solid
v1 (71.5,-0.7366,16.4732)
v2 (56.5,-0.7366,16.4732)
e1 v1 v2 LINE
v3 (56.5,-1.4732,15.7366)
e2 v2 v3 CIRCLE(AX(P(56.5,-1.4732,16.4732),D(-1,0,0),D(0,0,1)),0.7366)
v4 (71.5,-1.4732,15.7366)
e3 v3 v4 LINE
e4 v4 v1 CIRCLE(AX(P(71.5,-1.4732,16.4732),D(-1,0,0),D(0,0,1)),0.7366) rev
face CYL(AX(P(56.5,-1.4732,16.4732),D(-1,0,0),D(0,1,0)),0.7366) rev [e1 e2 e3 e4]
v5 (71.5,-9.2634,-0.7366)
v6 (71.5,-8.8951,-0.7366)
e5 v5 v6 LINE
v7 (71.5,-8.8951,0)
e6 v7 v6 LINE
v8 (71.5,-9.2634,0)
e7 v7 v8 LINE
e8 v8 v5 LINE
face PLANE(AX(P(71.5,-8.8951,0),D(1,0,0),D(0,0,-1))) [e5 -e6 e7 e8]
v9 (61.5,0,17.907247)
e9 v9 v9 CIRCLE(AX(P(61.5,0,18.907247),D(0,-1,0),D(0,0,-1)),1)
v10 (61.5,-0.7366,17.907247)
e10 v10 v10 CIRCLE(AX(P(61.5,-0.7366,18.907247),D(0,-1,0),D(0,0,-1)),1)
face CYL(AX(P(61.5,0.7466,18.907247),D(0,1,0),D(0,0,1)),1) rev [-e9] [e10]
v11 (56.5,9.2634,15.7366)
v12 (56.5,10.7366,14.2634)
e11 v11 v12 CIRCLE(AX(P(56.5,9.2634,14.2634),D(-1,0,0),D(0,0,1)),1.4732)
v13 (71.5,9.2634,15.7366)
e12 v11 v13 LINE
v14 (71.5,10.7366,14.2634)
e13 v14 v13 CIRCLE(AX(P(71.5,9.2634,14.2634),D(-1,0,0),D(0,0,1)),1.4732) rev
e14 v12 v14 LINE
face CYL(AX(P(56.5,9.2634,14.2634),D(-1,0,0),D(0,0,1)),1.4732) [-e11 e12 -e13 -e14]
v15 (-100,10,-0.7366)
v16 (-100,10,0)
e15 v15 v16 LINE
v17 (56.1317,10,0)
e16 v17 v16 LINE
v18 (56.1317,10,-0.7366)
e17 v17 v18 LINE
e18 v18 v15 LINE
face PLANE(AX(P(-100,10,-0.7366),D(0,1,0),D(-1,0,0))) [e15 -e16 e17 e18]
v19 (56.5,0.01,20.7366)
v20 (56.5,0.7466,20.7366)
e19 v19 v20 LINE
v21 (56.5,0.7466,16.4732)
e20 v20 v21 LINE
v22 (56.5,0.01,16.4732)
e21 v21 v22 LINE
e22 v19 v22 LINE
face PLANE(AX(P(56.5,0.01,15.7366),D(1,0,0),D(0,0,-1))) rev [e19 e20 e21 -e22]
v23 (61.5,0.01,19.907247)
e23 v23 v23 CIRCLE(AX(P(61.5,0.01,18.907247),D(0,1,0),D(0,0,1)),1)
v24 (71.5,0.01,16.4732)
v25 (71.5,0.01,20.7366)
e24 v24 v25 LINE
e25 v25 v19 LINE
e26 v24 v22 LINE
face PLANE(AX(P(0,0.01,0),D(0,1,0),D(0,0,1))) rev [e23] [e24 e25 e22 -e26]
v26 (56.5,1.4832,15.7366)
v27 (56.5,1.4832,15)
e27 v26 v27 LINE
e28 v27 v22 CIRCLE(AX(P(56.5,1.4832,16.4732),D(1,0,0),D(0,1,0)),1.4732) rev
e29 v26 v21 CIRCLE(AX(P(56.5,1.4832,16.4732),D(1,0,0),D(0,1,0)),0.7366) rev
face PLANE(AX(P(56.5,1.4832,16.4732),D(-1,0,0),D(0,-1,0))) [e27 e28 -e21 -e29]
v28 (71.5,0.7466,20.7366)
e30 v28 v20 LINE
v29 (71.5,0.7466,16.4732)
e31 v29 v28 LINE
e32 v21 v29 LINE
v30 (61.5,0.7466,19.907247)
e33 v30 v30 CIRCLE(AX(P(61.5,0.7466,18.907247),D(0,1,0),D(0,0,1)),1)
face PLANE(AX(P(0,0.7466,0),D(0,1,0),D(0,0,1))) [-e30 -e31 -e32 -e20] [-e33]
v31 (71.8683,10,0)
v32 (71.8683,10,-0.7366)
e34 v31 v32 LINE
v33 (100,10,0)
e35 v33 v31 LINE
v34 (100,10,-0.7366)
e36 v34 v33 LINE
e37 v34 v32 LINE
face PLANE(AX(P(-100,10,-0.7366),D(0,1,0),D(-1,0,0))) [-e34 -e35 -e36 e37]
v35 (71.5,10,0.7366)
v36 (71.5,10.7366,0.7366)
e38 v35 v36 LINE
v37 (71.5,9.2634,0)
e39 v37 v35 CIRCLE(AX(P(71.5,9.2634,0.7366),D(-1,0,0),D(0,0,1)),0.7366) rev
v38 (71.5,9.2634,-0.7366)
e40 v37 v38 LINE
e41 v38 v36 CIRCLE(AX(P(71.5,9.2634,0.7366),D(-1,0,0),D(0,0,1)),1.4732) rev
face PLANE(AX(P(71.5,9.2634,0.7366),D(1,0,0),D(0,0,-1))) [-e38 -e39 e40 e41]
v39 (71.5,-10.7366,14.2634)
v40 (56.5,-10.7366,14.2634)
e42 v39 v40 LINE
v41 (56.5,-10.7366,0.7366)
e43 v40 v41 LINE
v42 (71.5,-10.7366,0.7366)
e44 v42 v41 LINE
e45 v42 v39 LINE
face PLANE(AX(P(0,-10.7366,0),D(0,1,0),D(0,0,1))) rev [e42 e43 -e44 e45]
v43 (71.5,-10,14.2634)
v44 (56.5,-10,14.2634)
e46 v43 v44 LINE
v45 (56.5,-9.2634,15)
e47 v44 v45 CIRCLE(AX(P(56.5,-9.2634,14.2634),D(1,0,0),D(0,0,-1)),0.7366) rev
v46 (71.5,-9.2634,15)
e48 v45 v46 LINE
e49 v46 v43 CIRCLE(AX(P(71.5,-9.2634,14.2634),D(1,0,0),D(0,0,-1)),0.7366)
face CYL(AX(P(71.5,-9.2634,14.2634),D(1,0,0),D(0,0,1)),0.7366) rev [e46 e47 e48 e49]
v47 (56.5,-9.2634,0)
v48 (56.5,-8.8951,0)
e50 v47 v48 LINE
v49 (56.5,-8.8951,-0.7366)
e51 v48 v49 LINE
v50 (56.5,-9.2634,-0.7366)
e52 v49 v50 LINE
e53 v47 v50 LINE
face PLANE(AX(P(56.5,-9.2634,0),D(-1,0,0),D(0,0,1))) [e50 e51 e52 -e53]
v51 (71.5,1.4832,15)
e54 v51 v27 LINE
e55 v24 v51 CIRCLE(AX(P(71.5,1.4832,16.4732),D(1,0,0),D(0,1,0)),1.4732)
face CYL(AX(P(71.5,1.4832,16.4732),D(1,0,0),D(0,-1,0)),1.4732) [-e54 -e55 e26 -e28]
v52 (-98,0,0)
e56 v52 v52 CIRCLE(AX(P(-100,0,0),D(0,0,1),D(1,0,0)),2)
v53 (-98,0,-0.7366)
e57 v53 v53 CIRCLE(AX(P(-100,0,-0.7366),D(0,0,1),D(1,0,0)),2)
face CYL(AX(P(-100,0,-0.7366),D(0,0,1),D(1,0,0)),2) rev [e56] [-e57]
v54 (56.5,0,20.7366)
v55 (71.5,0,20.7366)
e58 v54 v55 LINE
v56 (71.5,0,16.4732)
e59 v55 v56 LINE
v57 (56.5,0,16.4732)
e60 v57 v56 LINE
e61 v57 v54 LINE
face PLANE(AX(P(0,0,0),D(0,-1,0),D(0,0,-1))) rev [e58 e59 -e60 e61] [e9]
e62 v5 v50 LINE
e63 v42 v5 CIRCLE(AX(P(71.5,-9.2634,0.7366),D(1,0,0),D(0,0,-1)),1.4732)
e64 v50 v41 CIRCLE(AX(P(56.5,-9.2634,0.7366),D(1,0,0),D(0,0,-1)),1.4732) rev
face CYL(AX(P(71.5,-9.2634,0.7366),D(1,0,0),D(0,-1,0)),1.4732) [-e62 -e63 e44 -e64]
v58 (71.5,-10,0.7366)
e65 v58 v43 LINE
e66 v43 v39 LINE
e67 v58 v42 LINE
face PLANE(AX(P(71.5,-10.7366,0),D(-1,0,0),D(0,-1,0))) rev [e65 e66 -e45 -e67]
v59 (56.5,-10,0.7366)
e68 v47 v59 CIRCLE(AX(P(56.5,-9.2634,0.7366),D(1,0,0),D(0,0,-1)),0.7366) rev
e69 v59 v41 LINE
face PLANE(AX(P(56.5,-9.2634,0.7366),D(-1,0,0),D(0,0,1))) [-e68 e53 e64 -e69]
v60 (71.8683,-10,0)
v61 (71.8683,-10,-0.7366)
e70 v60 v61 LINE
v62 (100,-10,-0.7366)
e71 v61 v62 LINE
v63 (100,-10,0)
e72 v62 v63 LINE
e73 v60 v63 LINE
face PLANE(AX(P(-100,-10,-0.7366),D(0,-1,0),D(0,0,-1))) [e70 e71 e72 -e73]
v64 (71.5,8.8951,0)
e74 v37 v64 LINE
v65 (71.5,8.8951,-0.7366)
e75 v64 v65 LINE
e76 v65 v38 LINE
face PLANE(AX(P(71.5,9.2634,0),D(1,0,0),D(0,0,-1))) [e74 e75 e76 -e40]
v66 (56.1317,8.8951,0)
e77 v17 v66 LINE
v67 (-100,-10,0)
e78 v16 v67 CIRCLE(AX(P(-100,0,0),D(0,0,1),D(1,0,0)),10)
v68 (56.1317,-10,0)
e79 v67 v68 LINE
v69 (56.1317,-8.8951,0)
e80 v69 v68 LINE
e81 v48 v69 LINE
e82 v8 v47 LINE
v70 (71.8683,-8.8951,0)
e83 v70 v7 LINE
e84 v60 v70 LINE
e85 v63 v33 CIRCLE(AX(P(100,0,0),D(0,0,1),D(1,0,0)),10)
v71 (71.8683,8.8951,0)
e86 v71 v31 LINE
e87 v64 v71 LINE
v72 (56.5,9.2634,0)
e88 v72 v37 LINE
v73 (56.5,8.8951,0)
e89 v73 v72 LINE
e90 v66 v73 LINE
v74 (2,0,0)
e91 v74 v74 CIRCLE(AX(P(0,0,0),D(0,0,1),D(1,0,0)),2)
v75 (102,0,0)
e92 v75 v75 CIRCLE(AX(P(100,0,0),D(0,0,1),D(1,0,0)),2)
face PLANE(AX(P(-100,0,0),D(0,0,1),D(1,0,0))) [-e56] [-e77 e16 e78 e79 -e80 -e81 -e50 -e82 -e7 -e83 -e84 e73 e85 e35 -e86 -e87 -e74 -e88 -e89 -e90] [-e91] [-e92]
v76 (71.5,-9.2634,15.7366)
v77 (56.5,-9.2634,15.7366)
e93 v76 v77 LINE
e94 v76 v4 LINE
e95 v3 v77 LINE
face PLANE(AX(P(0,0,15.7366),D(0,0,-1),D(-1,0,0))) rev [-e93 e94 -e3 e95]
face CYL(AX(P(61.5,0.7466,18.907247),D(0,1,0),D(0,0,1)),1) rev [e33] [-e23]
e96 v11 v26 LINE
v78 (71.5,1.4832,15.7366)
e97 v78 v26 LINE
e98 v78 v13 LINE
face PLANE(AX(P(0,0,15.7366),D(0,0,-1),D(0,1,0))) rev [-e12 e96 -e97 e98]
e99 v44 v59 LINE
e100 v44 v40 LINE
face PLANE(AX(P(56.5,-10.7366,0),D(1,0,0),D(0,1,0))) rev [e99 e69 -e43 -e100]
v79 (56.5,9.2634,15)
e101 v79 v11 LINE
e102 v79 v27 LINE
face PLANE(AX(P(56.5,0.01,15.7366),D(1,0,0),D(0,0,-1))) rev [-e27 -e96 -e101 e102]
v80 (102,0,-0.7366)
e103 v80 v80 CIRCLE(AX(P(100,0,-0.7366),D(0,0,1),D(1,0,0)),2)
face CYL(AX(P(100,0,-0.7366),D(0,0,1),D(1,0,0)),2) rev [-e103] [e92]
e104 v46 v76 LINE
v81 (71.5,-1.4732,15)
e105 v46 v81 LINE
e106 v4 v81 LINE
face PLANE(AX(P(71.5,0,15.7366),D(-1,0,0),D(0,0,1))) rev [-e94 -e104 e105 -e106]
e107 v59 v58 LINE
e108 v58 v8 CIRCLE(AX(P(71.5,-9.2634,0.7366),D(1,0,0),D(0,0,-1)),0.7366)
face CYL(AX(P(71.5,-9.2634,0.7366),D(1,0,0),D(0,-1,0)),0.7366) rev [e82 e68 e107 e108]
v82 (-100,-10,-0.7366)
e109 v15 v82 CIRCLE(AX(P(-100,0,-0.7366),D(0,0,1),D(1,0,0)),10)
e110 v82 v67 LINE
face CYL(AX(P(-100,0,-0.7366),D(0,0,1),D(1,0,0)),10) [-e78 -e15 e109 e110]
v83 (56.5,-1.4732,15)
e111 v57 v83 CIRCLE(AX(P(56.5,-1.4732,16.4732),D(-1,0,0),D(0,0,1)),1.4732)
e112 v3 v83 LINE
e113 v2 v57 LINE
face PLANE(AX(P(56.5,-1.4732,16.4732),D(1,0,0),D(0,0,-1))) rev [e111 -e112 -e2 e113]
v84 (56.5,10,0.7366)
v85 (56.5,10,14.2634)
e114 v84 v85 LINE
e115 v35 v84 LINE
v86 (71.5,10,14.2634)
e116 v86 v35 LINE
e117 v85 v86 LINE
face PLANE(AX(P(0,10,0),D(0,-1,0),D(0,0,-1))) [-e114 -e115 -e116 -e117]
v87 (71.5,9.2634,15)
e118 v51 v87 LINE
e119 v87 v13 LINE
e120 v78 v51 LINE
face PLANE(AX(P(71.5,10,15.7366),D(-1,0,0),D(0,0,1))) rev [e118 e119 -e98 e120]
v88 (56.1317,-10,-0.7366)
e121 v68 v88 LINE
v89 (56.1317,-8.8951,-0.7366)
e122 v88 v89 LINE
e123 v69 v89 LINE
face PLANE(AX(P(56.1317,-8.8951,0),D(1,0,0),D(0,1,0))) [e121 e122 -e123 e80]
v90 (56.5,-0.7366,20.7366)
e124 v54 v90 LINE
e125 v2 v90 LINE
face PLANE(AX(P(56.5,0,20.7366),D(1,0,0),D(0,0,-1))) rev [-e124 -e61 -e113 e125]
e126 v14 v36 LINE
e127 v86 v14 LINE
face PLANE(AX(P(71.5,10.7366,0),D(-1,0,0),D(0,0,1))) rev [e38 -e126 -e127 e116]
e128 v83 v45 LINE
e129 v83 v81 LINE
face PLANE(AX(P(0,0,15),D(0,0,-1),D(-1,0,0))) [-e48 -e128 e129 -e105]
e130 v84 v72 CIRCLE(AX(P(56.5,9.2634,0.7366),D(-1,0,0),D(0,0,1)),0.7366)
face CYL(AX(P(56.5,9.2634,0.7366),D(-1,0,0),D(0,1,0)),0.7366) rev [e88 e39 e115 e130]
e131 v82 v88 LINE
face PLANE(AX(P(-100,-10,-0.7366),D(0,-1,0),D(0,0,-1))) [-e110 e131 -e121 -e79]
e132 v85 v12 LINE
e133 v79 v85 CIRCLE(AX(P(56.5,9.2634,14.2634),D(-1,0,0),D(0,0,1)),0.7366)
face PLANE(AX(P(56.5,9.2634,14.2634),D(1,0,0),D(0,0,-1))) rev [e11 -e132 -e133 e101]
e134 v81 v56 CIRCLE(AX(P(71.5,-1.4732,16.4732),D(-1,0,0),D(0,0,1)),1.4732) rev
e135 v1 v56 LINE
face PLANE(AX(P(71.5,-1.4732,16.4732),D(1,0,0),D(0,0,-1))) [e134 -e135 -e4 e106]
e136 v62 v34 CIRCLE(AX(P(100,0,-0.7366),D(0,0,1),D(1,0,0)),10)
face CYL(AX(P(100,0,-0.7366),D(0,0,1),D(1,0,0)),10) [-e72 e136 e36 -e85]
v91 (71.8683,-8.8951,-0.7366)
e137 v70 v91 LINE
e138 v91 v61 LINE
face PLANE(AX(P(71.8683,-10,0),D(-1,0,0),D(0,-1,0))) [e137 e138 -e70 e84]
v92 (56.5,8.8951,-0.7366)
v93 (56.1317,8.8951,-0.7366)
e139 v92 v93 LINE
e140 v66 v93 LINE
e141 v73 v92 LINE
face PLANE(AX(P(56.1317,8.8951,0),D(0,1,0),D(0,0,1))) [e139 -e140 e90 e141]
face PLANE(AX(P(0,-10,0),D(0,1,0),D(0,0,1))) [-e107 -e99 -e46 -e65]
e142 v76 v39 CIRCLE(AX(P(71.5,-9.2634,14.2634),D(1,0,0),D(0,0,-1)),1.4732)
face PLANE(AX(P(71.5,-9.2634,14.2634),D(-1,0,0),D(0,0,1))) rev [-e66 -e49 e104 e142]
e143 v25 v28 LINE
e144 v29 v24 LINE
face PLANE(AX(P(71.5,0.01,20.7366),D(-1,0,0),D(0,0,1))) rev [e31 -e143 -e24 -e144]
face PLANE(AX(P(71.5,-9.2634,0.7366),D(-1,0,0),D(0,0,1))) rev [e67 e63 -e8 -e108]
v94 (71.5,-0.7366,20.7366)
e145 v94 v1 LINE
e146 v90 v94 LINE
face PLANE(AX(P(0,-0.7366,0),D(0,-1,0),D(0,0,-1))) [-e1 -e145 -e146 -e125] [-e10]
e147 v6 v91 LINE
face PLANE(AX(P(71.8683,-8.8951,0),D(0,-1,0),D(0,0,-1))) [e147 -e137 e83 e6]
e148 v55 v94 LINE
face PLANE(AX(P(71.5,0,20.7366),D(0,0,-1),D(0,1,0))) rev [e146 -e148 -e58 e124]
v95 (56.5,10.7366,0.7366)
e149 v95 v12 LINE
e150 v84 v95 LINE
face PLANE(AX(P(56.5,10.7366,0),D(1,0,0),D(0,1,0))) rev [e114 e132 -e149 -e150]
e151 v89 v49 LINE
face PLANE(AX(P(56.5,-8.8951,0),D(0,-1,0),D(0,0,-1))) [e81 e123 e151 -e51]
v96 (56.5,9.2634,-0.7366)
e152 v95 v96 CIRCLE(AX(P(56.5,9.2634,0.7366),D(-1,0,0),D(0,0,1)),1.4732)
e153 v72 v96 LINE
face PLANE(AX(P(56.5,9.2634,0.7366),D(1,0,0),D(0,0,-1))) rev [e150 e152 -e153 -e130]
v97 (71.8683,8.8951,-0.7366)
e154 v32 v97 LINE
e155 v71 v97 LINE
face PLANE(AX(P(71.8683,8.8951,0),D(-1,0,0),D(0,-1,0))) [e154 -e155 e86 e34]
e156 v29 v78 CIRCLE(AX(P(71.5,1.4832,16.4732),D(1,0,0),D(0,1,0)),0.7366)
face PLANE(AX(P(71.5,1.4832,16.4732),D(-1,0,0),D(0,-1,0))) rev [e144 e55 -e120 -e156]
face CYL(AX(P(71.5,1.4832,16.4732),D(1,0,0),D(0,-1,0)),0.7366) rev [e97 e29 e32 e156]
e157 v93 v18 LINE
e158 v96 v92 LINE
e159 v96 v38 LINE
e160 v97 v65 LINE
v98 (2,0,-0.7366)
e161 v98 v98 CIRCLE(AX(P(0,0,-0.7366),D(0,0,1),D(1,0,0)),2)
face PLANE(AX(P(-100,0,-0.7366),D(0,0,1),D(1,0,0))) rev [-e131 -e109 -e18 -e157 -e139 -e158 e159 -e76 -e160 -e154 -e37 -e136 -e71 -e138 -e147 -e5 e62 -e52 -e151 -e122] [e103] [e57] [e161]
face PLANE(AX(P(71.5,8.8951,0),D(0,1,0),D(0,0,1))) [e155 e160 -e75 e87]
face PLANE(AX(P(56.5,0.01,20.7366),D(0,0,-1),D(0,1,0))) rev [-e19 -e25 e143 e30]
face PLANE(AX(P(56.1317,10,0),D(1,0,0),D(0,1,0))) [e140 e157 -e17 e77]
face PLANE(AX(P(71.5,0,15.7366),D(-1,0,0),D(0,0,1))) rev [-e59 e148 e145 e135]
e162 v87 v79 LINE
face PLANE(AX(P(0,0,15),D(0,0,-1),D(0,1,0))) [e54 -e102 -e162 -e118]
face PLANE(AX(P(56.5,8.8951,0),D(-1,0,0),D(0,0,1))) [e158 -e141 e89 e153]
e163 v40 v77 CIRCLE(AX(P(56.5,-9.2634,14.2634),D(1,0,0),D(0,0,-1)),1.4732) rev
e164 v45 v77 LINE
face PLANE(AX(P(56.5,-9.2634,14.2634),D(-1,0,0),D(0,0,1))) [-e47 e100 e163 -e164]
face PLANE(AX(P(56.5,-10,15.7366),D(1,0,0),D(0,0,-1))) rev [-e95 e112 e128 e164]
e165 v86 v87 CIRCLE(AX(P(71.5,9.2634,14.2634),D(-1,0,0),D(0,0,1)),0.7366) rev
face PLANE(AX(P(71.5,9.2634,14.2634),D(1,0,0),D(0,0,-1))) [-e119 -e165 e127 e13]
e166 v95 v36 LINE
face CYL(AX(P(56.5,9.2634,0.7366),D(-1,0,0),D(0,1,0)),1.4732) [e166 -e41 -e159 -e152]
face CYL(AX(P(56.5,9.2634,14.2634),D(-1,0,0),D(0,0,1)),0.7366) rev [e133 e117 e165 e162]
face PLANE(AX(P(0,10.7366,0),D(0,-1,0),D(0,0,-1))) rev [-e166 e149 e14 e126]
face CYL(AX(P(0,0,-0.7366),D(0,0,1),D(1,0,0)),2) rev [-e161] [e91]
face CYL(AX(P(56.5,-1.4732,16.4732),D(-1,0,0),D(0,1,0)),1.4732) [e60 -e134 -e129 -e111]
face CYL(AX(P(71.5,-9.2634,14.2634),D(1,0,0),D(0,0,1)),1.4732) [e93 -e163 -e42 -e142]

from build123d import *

# Parameters (mm, degrees)
SKETCH2_R                     = 2
BASE_FLANGE1_DEPTH            = 0.7366
EDGE_FLANGE1_STRIP_W          = 4.4196
EDGE_FLANGE1_STRIP_H          = 0.7366
EDGE_FLANGE1_STRIP_CUT_DEPTH  = 15
EDGE_FLANGE1_RELIEF_W         = 4.7879
EDGE_FLANGE1_RELIEF_H         = 0.3683
EDGE_FLANGE1_RELIEF_CUT_DEPTH = 0.7366
EDGE_FLANGE1_DEPTH            = 15
EDGE_FLANGE4_STRIP_W          = 4.4196
EDGE_FLANGE4_STRIP_H          = 0.7366
EDGE_FLANGE4_STRIP_CUT_DEPTH  = 15
EDGE_FLANGE4_RELIEF_W         = 4.7879
EDGE_FLANGE4_RELIEF_H         = 0.3683
EDGE_FLANGE4_RELIEF_CUT_DEPTH = 0.7366
EDGE_FLANGE4_DEPTH            = 15
EDGE_FLANGE5_STRIP_W          = 4.4196
EDGE_FLANGE5_STRIP_H          = 0.7366
EDGE_FLANGE5_STRIP_CUT_DEPTH  = 15
EDGE_FLANGE5_DEPTH            = 15
EDGE_FLANGE6_STRIP_W          = 4.4196
EDGE_FLANGE6_STRIP_H          = 0.7366
EDGE_FLANGE6_STRIP_CUT_DEPTH  = 15
EDGE_FLANGE6_DEPTH            = 15
EDGE_FLANGE7_START            = 56.5
EDGE_FLANGE7_DEPTH            = 15
EDGE_FLANGE7_2_DEPTH          = 15
EDGE_FLANGE8_START            = 56.5
EDGE_FLANGE8_DEPTH            = 15
EDGE_FLANGE8_2_DEPTH          = 15
F_2_0_2_DIAMETER_HOLE4_D      = 2


# Read off the part's stored shape, not the designer's step: Edge-Flange7, Edge-Flange8
# Sheet-metal steps are written as plain solids
with BuildPart() as part:
    # Sketch2 → Base-Flange1 (new body)
    with BuildSketch(Plane.XY):
        with BuildLine():
            Line((-100, 10), (100, 10))
            ThreePointArc((100, 10), (110, 0), (100, -10))
            Line((100, -10), (-100, -10))
            ThreePointArc((-100, -10), (-110, 0), (-100, 10))
        make_face()
        with Locations((100, 0)):
            Circle(SKETCH2_R, mode=Mode.SUBTRACT)
        Circle(SKETCH2_R, mode=Mode.SUBTRACT)
        with Locations((-100, 0)):
            Circle(SKETCH2_R, mode=Mode.SUBTRACT)
    extrude(amount=-BASE_FLANGE1_DEPTH)

    # Edge-Flange1 strip (across the edge) → Edge-Flange1 strip cut (cut)
    with BuildSketch(Plane(origin=(71.5, 10, 0), x_dir=(0, -1, 0), z_dir=(-1, 0, 0))):
        with Locations((-1.4732, -0.3683)):
            Rectangle(EDGE_FLANGE1_STRIP_W, EDGE_FLANGE1_STRIP_H)
    extrude(amount=EDGE_FLANGE1_STRIP_CUT_DEPTH, mode=Mode.SUBTRACT)

    # Edge-Flange1 relief (on the sheet) → Edge-Flange1 relief cut (cut)
    with BuildSketch(Plane(origin=(71.5, 9.2634, 0), x_dir=(0, -1, 0), z_dir=(0, 0, 1))):
        with Locations((-2.02565, 0.18415)):
            Rectangle(EDGE_FLANGE1_RELIEF_W, EDGE_FLANGE1_RELIEF_H)
        with Locations((-2.02565, -15.18415)):
            Rectangle(EDGE_FLANGE1_RELIEF_W, EDGE_FLANGE1_RELIEF_H)
    extrude(amount=-EDGE_FLANGE1_RELIEF_CUT_DEPTH, mode=Mode.SUBTRACT)

    # Edge-Flange1 section (across the edge) → Edge-Flange1 (add)
    with BuildSketch(Plane(origin=(71.5, 10, 0), x_dir=(0, -1, 0), z_dir=(-1, 0, 0))):
        with BuildLine():
            Line((-0.7366, 0.7366), (-0.7366, 15))
            Line((-0.7366, 15), (0, 15))
            Line((0, 15), (0, 0.7366))
            ThreePointArc((0, 0.7366), (0.215745145, 0.215745145), (0.7366, 0))
            Line((0.7366, 0), (0.7366, -0.7366))
            ThreePointArc((0.7366, -0.7366), (-0.30510971, -0.30510971), (-0.7366, 0.7366))
        make_face()
    extrude(amount=EDGE_FLANGE1_DEPTH)

    # Edge-Flange4 strip (across the edge) → Edge-Flange4 strip cut (cut)
    with BuildSketch(Plane(origin=(56.5, -10, 0), x_dir=(0, 1, 0), z_dir=(1, 0, 0))):
        with Locations((-1.4732, -0.3683)):
            Rectangle(EDGE_FLANGE4_STRIP_W, EDGE_FLANGE4_STRIP_H)
    extrude(amount=EDGE_FLANGE4_STRIP_CUT_DEPTH, mode=Mode.SUBTRACT)

    # Edge-Flange4 relief (on the sheet) → Edge-Flange4 relief cut (cut)
    with BuildSketch(Plane(origin=(56.5, -9.2634, 0), x_dir=(0, 1, 0), z_dir=(0, 0, 1))):
        with Locations((-2.02565, 0.18415)):
            Rectangle(EDGE_FLANGE4_RELIEF_W, EDGE_FLANGE4_RELIEF_H)
        with Locations((-2.02565, -15.18415)):
            Rectangle(EDGE_FLANGE4_RELIEF_W, EDGE_FLANGE4_RELIEF_H)
    extrude(amount=-EDGE_FLANGE4_RELIEF_CUT_DEPTH, mode=Mode.SUBTRACT)

    # Edge-Flange4 section (across the edge) → Edge-Flange4 (add)
    with BuildSketch(Plane(origin=(56.5, -10, 0), x_dir=(0, 1, 0), z_dir=(1, 0, 0))):
        with BuildLine():
            Line((-0.7366, 0.7366), (-0.7366, 15))
            Line((-0.7366, 15), (0, 15))
            Line((0, 15), (0, 0.7366))
            ThreePointArc((0, 0.7366), (0.215745145, 0.215745145), (0.7366, 0))
            Line((0.7366, 0), (0.7366, -0.7366))
            ThreePointArc((0.7366, -0.7366), (-0.30510971, -0.30510971), (-0.7366, 0.7366))
        make_face()
    extrude(amount=EDGE_FLANGE4_DEPTH)

    # Edge-Flange5 strip (across the edge) → Edge-Flange5 strip cut (cut)
    with BuildSketch(Plane(origin=(71.5, 10, 15), x_dir=(0, 0, -1), z_dir=(-1, 0, 0))):
        with Locations((-1.4732, -0.3683)):
            Rectangle(EDGE_FLANGE5_STRIP_W, EDGE_FLANGE5_STRIP_H)
    extrude(amount=EDGE_FLANGE5_STRIP_CUT_DEPTH, mode=Mode.SUBTRACT)

    # Edge-Flange5 section (across the edge) → Edge-Flange5 (add)
    with BuildSketch(Plane(origin=(71.5, 10, 15), x_dir=(0, 0, -1), z_dir=(-1, 0, 0))):
        with BuildLine():
            Line((-0.7366, 0.7366), (-0.7366, 9.99))
            Line((-0.7366, 9.99), (0, 9.99))
            Line((0, 9.99), (0, 0.7366))
            ThreePointArc((0, 0.7366), (0.215745145, 0.215745145), (0.7366, 0))
            Line((0.7366, 0), (0.7366, -0.7366))
            ThreePointArc((0.7366, -0.7366), (-0.30510971, -0.30510971), (-0.7366, 0.7366))
        make_face()
    extrude(amount=EDGE_FLANGE5_DEPTH)

    # Edge-Flange6 strip (across the edge) → Edge-Flange6 strip cut (cut)
    with BuildSketch(Plane(origin=(56.5, -10, 15), x_dir=(0, 0, -1), z_dir=(1, 0, 0))):
        with Locations((-1.4732, -0.3683)):
            Rectangle(EDGE_FLANGE6_STRIP_W, EDGE_FLANGE6_STRIP_H)
    extrude(amount=EDGE_FLANGE6_STRIP_CUT_DEPTH, mode=Mode.SUBTRACT)

    # Edge-Flange6 section (across the edge) → Edge-Flange6 (add)
    with BuildSketch(Plane(origin=(56.5, -10, 15), x_dir=(0, 0, -1), z_dir=(1, 0, 0))):
        with BuildLine():
            Line((-0.7366, 0.7366), (-0.7366, 10))
            Line((-0.7366, 10), (0, 10))
            Line((0, 10), (0, 0.7366))
            ThreePointArc((0, 0.7366), (0.215745145, 0.215745145), (0.7366, 0))
            Line((0.7366, 0), (0.7366, -0.7366))
            ThreePointArc((0.7366, -0.7366), (-0.30510971, -0.30510971), (-0.7366, 0.7366))
        make_face()
    extrude(amount=EDGE_FLANGE6_DEPTH)

    # Edge-Flange7 outline → Edge-Flange7 (cut)
    with BuildSketch(Plane.YZ.offset(EDGE_FLANGE7_START)):
        with BuildLine():
            Line((0, 15.7366), (-0.197371375, 15.7366))
            ThreePointArc((-0.197371375, 15.7366), (-0.7366, 15.197371375), (-1.4732, 15))
            Line((-1.4732, 15), (0, 15))
            Line((0, 15), (0, 15.7366))
        make_face()
    extrude(amount=EDGE_FLANGE7_DEPTH, mode=Mode.SUBTRACT)

    # Edge-Flange7 2 outline → Edge-Flange7 2 (add)
    with BuildSketch(Plane.YZ.offset(EDGE_FLANGE7_START)):
        with BuildLine():
            ThreePointArc((-0.197371375, 15.7366), (-0.050198073, 16.091907783), (0, 16.4732))
            Line((0, 16.4732), (0, 20.7366))
            Line((0, 20.7366), (-0.7366, 20.7366))
            Line((-0.7366, 20.7366), (-0.7366, 16.4732))
            ThreePointArc((-0.7366, 16.4732), (-0.952345145, 15.952345145), (-1.4732, 15.7366))
            Line((-1.4732, 15.7366), (-0.197371375, 15.7366))
        make_face()
    extrude(amount=EDGE_FLANGE7_2_DEPTH)

    # Edge-Flange8 outline → Edge-Flange8 (cut)
    with BuildSketch(Plane.YZ.offset(EDGE_FLANGE8_START)):
        with BuildLine():
            ThreePointArc((1.4832, 15), (0.7466, 15.197371375), (0.207371375, 15.7366))
            Line((0.207371375, 15.7366), (0.01, 15.7366))
            Line((0.01, 15.7366), (0.01, 15))
            Line((0.01, 15), (1.4832, 15))
        make_face()
    extrude(amount=EDGE_FLANGE8_DEPTH, mode=Mode.SUBTRACT)

    # Edge-Flange8 2 outline → Edge-Flange8 2 (add)
    with BuildSketch(Plane.YZ.offset(EDGE_FLANGE8_START)):
        with BuildLine():
            Line((0.7466, 20.7366), (0.01, 20.7366))
            Line((0.01, 20.7366), (0.01, 16.4732))
            ThreePointArc((0.01, 16.4732), (0.060198073, 16.091907783), (0.207371375, 15.7366))
            Line((0.207371375, 15.7366), (1.4832, 15.7366))
            ThreePointArc((1.4832, 15.7366), (0.962345145, 15.952345145), (0.7466, 16.4732))
            Line((0.7466, 16.4732), (0.7466, 20.7366))
        make_face()
    extrude(amount=EDGE_FLANGE8_2_DEPTH)

    # Ø2.0 (2) Diameter Hole4 (through all)
    with Locations(Plane(origin=(0, 0.7466, 0), x_dir=(1, 0, 0), z_dir=(0, 1, 0))):
        with Locations((61.5, -18.907246823)):
            Hole(F_2_0_2_DIAMETER_HOLE4_D / 2)


solid = part.part
